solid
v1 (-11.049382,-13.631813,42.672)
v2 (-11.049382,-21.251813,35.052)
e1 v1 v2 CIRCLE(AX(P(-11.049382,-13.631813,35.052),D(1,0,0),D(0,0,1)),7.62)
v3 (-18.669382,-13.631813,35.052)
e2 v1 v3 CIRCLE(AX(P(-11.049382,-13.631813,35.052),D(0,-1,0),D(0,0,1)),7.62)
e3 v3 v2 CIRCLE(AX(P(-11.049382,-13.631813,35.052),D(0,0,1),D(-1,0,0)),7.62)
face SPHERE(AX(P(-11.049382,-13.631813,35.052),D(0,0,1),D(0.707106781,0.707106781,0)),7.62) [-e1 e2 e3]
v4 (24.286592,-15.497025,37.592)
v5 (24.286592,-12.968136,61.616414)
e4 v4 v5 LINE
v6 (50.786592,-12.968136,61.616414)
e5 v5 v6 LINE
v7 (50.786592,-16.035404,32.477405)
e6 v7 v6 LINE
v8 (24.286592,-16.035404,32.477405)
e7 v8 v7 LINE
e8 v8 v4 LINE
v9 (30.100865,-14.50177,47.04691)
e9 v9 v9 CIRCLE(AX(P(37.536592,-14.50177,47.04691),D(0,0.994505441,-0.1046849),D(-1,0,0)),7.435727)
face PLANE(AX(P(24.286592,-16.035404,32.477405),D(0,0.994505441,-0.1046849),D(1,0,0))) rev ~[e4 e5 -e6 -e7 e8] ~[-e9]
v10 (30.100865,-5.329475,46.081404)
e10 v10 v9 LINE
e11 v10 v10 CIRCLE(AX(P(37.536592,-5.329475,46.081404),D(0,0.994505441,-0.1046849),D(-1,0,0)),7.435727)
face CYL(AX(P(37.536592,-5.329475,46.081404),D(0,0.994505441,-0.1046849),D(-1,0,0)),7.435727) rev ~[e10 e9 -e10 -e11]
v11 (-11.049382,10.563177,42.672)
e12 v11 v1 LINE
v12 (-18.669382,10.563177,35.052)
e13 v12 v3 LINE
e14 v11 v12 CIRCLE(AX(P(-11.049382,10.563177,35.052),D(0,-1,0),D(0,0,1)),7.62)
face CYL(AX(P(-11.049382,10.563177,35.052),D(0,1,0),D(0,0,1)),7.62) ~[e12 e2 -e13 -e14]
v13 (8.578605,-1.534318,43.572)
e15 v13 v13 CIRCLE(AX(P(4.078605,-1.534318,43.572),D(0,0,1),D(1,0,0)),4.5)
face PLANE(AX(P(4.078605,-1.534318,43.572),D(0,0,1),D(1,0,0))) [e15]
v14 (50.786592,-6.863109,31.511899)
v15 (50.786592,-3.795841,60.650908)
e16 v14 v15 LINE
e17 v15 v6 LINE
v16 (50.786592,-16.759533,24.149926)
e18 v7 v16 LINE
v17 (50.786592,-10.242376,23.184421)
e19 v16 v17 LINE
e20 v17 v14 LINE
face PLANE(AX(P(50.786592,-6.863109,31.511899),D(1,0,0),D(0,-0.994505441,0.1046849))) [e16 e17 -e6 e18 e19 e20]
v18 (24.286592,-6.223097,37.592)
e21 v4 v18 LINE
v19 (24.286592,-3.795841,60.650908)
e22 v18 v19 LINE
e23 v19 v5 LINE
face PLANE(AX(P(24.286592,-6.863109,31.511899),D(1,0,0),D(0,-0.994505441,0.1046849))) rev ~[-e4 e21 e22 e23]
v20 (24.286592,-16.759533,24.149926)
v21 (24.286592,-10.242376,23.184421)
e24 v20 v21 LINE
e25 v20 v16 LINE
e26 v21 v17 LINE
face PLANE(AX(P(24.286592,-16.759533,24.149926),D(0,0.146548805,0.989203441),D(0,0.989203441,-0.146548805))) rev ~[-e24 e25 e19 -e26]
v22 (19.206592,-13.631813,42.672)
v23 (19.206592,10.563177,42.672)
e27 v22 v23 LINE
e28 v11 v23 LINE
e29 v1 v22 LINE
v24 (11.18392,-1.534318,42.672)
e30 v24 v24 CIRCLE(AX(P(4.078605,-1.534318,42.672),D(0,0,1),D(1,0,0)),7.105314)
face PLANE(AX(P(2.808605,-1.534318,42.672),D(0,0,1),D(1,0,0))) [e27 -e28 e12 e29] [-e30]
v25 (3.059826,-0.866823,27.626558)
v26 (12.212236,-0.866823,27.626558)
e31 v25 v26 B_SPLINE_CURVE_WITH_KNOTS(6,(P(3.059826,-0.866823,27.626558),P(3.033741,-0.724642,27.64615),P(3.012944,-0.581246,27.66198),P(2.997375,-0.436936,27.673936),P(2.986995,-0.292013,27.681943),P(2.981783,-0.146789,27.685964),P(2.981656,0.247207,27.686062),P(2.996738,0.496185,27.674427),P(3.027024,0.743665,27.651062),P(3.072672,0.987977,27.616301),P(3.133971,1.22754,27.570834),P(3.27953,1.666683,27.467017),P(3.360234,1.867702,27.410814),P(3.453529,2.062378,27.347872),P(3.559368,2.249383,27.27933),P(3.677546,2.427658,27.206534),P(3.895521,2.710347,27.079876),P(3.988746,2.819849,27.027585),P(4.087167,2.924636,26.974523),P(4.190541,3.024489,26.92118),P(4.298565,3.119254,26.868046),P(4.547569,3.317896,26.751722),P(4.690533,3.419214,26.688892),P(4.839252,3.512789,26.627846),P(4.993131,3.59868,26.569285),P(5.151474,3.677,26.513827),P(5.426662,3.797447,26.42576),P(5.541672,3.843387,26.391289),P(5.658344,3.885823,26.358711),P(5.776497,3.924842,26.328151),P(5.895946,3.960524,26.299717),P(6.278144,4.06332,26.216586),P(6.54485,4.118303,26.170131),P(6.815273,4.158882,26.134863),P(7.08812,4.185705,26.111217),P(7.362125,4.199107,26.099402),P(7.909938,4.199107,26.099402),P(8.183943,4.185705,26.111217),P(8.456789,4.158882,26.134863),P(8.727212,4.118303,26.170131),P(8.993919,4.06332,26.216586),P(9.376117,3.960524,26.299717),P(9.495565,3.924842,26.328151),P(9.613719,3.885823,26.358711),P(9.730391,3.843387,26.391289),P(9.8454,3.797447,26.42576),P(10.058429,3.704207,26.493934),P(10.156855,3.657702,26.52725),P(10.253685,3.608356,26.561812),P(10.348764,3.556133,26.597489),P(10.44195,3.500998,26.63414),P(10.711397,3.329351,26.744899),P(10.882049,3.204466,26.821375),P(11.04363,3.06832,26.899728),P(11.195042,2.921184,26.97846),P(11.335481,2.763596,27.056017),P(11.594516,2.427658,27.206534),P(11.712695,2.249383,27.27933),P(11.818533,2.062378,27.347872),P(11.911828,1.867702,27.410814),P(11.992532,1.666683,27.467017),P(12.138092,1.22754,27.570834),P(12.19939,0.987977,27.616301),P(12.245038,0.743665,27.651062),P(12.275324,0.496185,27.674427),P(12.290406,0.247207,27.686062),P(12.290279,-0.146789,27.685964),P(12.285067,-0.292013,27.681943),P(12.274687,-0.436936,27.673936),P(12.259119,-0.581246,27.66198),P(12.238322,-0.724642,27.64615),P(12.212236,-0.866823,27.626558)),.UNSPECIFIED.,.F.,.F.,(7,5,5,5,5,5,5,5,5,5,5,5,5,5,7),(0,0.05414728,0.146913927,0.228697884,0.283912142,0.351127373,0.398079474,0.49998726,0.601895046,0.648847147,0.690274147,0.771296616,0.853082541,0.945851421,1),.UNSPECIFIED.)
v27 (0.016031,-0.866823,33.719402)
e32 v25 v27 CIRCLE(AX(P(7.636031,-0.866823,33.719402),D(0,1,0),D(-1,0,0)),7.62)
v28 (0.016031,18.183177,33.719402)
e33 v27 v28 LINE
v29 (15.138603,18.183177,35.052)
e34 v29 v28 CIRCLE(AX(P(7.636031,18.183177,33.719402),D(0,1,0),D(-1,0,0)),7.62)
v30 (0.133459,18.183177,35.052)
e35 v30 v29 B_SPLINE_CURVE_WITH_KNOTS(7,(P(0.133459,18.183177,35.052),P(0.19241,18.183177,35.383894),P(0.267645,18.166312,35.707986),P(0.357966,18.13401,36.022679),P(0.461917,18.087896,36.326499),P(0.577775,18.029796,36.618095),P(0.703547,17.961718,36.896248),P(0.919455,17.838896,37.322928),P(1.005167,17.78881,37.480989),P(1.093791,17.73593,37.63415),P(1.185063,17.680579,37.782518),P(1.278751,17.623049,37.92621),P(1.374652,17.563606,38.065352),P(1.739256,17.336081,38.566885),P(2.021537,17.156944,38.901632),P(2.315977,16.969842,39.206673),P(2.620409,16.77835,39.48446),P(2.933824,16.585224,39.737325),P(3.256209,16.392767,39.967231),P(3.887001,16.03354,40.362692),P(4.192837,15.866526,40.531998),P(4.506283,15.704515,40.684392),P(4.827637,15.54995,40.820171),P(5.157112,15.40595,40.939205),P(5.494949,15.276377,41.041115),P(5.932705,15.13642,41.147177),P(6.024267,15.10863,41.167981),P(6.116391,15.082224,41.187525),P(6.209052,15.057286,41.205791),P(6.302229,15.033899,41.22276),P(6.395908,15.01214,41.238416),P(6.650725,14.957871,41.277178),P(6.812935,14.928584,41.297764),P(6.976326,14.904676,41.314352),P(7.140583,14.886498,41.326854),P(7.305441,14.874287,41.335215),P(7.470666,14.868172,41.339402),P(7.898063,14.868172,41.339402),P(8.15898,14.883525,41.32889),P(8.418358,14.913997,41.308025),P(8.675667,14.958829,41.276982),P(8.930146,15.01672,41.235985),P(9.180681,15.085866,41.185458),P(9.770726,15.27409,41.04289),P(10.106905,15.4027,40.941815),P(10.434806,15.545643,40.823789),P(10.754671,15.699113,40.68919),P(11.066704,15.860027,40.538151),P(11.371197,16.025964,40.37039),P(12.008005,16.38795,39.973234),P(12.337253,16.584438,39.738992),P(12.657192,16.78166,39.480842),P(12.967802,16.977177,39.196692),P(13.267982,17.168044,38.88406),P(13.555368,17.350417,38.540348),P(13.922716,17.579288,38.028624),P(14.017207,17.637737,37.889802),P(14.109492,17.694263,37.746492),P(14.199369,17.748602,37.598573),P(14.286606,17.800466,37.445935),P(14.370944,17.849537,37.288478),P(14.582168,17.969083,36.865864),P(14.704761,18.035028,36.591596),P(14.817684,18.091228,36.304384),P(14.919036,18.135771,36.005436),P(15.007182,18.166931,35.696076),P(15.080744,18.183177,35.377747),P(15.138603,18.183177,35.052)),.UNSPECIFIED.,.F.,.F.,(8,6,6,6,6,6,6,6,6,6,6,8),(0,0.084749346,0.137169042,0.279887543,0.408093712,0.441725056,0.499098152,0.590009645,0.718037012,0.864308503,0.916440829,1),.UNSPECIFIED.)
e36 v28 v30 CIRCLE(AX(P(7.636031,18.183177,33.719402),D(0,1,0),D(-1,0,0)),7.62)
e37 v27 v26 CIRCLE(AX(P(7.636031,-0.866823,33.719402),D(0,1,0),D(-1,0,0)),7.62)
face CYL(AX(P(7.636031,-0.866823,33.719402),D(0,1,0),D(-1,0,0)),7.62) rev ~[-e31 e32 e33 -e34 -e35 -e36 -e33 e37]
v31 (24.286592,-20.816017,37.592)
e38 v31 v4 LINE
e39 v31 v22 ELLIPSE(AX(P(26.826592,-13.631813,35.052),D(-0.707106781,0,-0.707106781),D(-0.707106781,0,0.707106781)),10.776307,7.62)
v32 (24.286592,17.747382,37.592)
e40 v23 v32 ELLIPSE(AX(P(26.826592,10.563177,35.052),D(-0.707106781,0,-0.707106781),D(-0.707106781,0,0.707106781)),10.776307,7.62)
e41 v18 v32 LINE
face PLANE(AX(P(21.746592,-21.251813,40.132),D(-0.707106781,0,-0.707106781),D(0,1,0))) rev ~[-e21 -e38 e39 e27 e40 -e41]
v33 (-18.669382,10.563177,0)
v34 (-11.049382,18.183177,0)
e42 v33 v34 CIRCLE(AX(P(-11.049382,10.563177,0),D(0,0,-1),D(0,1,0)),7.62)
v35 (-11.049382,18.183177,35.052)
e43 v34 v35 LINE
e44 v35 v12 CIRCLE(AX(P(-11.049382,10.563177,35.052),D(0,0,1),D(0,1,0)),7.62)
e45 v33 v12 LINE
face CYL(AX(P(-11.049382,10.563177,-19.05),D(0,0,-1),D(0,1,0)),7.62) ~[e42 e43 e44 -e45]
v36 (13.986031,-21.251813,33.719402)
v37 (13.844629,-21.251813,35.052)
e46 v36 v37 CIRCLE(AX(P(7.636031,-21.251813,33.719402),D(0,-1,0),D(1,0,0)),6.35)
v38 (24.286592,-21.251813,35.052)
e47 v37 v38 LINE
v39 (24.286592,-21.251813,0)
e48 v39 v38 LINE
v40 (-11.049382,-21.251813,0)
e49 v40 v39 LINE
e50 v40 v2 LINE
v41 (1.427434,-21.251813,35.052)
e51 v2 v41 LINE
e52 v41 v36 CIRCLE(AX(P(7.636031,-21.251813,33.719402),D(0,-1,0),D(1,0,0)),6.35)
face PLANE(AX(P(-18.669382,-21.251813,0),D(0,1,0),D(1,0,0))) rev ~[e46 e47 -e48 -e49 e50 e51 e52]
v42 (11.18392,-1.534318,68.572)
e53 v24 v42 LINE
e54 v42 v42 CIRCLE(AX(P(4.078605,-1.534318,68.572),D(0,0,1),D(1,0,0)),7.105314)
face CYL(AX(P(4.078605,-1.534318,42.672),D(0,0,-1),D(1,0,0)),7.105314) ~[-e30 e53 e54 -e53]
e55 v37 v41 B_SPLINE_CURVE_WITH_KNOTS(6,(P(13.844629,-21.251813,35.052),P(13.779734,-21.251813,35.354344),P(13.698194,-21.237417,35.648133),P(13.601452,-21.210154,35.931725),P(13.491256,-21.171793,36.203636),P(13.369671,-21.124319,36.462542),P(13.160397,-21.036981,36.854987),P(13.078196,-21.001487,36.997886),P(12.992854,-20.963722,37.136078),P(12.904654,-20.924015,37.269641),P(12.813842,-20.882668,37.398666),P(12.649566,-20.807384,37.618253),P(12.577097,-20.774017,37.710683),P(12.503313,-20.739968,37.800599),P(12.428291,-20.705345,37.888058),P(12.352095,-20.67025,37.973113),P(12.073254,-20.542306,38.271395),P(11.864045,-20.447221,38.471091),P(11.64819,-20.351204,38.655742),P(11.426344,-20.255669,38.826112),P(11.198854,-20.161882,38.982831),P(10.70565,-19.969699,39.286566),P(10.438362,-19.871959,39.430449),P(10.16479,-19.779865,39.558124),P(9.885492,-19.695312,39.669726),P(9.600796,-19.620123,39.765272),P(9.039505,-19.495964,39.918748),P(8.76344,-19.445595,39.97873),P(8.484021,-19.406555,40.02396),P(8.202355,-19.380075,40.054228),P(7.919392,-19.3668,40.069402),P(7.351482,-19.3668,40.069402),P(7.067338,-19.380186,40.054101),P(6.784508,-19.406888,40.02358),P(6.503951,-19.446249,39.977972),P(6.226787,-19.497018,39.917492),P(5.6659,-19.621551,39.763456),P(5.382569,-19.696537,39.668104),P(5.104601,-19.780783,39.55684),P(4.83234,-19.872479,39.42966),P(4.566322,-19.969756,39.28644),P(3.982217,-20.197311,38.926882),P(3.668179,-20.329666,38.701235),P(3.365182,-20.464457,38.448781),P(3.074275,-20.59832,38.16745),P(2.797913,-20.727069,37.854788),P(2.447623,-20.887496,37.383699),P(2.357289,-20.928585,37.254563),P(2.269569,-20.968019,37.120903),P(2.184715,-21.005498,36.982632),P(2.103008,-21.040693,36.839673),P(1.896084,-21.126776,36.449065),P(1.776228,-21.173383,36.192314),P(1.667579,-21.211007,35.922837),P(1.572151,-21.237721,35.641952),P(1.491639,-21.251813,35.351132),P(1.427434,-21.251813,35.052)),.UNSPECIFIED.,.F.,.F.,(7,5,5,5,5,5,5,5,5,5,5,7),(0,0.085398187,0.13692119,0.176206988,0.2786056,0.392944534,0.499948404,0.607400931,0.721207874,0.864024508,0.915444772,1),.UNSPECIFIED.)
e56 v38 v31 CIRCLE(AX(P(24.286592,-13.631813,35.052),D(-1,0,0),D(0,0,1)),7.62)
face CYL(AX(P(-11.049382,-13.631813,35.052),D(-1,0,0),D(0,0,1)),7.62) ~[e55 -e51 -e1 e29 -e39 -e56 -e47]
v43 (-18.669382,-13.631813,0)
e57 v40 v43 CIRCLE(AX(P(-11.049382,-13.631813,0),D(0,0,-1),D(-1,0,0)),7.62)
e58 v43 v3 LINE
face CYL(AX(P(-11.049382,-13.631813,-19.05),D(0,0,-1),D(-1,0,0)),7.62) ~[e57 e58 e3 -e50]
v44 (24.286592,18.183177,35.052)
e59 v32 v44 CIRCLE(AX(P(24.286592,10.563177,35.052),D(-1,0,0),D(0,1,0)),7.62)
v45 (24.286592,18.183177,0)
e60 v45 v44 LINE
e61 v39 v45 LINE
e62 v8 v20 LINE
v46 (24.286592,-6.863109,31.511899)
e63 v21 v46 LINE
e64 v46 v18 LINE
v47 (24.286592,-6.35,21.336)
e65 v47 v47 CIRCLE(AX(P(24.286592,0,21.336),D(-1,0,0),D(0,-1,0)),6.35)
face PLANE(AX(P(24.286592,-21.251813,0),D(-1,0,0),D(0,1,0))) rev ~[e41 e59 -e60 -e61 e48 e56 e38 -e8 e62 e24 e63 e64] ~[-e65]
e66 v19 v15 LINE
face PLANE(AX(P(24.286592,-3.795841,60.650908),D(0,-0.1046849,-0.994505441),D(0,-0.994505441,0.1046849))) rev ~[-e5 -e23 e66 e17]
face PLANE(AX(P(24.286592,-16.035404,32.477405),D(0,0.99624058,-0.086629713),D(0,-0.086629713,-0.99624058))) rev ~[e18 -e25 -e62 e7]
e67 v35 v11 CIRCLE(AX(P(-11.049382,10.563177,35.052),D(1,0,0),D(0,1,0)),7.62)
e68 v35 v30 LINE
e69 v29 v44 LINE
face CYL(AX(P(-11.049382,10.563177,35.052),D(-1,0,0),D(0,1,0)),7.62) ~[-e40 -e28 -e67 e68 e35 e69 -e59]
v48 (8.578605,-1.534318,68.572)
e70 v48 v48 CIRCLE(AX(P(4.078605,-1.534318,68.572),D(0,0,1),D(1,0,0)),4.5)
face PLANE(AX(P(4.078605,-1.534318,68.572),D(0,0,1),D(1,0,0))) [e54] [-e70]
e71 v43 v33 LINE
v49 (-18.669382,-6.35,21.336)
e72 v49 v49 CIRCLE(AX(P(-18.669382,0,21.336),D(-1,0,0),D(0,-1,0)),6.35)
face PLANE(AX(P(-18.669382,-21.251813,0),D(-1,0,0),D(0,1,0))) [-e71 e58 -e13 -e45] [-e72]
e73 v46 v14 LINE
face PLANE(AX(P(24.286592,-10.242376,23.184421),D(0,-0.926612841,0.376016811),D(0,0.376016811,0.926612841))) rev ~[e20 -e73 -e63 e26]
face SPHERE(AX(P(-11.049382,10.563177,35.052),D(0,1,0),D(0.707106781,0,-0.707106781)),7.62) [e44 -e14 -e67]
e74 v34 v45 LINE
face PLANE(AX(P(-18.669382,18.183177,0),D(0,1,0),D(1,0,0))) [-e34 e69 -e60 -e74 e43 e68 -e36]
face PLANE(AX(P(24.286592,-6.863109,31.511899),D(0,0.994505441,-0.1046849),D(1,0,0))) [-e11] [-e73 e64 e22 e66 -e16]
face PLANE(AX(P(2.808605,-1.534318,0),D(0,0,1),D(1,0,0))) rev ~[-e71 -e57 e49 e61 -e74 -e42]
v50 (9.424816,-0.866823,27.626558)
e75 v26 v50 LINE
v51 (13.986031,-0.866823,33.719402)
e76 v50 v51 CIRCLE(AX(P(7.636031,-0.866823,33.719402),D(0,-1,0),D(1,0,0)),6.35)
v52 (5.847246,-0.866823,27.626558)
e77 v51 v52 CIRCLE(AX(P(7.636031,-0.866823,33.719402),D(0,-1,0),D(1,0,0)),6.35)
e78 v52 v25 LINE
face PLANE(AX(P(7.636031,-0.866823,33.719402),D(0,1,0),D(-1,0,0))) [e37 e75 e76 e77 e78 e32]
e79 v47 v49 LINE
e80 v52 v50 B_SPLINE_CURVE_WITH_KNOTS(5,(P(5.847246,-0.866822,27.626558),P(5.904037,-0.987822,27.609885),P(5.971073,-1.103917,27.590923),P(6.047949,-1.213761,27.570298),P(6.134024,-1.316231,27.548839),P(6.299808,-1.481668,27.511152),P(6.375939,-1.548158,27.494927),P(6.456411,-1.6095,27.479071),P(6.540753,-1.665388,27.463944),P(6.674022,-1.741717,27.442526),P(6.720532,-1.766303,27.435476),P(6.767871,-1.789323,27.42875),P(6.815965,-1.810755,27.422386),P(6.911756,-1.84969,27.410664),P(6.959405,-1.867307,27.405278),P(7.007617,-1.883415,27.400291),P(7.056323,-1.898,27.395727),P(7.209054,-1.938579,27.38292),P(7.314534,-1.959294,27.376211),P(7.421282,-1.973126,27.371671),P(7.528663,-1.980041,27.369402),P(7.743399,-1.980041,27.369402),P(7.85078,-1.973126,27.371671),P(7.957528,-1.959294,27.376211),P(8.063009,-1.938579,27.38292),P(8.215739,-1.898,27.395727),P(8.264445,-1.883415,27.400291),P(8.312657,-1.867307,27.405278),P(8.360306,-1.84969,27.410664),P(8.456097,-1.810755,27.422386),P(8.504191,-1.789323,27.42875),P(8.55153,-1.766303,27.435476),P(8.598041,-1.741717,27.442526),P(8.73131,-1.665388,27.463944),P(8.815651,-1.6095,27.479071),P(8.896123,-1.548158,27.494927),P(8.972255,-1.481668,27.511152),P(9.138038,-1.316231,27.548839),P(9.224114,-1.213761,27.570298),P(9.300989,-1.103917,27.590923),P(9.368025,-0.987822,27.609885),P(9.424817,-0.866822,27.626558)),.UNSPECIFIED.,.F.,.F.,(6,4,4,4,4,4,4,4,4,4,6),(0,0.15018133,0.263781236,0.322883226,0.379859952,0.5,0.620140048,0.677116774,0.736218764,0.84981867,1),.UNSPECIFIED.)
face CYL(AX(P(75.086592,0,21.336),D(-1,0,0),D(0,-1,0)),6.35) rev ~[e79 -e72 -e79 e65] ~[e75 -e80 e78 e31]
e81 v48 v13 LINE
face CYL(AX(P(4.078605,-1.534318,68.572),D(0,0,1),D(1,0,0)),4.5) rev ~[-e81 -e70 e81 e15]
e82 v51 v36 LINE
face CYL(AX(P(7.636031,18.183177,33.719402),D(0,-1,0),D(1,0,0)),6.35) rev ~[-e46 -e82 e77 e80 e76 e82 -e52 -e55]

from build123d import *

# Parameters (mm, degrees)
F0_W           = 42.9559741169
F0_H           = 39.4349899143
F1_DEPTH       = 42.672
F3_D           = 12.7
F3_DEPTH       = 50.8
F3_TIP         = 3.8154649308
F5_D           = 12.7
F5_CBORE_D     = 15.24
F5_CBORE_DEPTH = 19.05
F6_SIZE        = 5.08
F7_T1_DEPTH    = 54.102
F7_T3_DEPTH    = 49.3059741169
F7_T5_DEPTH    = 24.1949899143
F7_S9_W        = 7.62
F7_S9_H        = 7.62
F7_T10_DEPTH   = 7.62
F7_S15_W       = 7.62
F7_S15_H       = 7.62
F7_T16_DEPTH   = 7.62
F11_R          = 7.1053142902
F12_DEPTH      = 25.9
F14_DEPTH      = 26.5
F15_DEPTH      = 29.3
F16_R          = 4.5
F17_DEPTH      = 25
F18_R          = 7.4357269109
F19_DEPTH      = 25


# Not quite as in the source:
# - a fillet or chamfer that OpenCascade refuses, or shapes differently, is made with other operations: its cross-section is extruded or revolved along the edge and cut away or added
# - the program builds the solid bodies; features that only make, move or delete a surface that nothing else refers to are left out


with BuildPart() as f1:
    # F0 (on Top) → F1 (new body)
    with BuildSketch(Plane.XY):
        with Locations((2.8086053208, -1.5343176201)):
            Rectangle(F0_W, F0_H)
    extrude(amount=F1_DEPTH)

    # F3
    with Locations(Plane.YZ.offset(24.2865923792)):
        with Locations((0, 21.336)):
            Hole(F3_D / 2, depth=F3_DEPTH)
            with Locations((0, 0, -(F3_DEPTH + F3_TIP / 2))):  # 118° drill point
                Cone(0, F3_D / 2, F3_TIP, mode=Mode.SUBTRACT)

    # F5 (through all)
    with Locations(Plane(origin=(0, 18.1831773371, 0), x_dir=(-1, 0, 0), z_dir=(0, 1, 0))):
        with Locations((-7.6360311359, 33.7194018066)):
            CounterBoreHole(F5_D / 2, F5_CBORE_D / 2, F5_CBORE_DEPTH)

    # F6
    f6_edges = [f1.edges().sort_by_distance(p)[0] for p in [
        (24.286592, -1.534318, 42.672),
    ]]
    chamfer(f6_edges, length=F6_SIZE)

    # F7: fillet of radius 7.62 on 5 edges, made by hand

    # F7_s2 → F7_t1 (cut)
    with BuildSketch(Plane.XY.offset(-19.05)):
        with BuildLine():
            ThreePointArc((-11.0493817377, 18.1831773371), (-16.4375354104, 15.9513310097), (-18.6693817377, 10.5631773371))
            Line((-18.6693817377, 10.5631773371), (-18.6693817377, 18.1831773371))
            Line((-18.6693817377, 18.1831773371), (-11.0493817377, 18.1831773371))
        make_face()
        with BuildLine():
            ThreePointArc((-18.6693817377, -13.6318125772), (-16.4375354104, -19.0199662499), (-11.0493817377, -21.2518125772))
            Line((-11.0493817377, -21.2518125772), (-18.6693817377, -21.2518125772))
            Line((-18.6693817377, -21.2518125772), (-18.6693817377, -13.6318125772))
        make_face()
    extrude(amount=F7_T1_DEPTH, mode=Mode.SUBTRACT)

    # F7_s4 → F7_t3 (cut)
    with BuildSketch(Plane.YZ.offset(-11.0493817377)):
        with BuildLine():
            ThreePointArc((18.1831773371, 35.052), (15.9513310097, 40.4401536726), (10.5631773371, 42.672))
            Line((10.5631773371, 42.672), (18.1831773371, 42.672))
            Line((18.1831773371, 42.672), (18.1831773371, 35.052))
        make_face()
        with BuildLine():
            ThreePointArc((-13.6318125772, 42.672), (-19.0199662499, 40.4401536726), (-21.2518125772, 35.052))
            Line((-21.2518125772, 35.052), (-21.2518125772, 42.672))
            Line((-21.2518125772, 42.672), (-13.6318125772, 42.672))
        make_face()
    extrude(amount=F7_T3_DEPTH, mode=Mode.SUBTRACT)

    # F7_s6 → F7_t5 (cut)
    with BuildSketch(Plane.XZ.offset(-10.5631773371)):
        with BuildLine():
            ThreePointArc((-11.0493817377, 42.672), (-16.4375354104, 40.4401536726), (-18.6693817377, 35.052))
            Line((-18.6693817377, 35.052), (-18.6693817377, 42.672))
            Line((-18.6693817377, 42.672), (-11.0493817377, 42.672))
        make_face()
    extrude(amount=F7_T5_DEPTH, mode=Mode.SUBTRACT)


with BuildPart() as f7_tool8:
    # F7_s9 → F7_t10 (new body)
    with BuildSketch(Plane.XZ.offset(-10.5631773371)):
        with Locations((-14.8593817377, 38.862)):
            Rectangle(F7_S9_W, F7_S9_H)
    extrude(amount=-F7_T10_DEPTH)

    # F7_s11 → F7_t12 (revolve, cut)
    with BuildSketch(Plane(origin=(-11.0493817377, 10.5631773371, 35.052), x_dir=(0.7071067812, 0, -0.7071067812), z_dir=(0.7071067812, 0, 0.7071067812))):
        with BuildLine():
            ThreePointArc((0, -7.62), (7.62, 0), (0, 7.62))
            Line((0, 7.62), (0, -7.62))
        make_face()
    revolve(axis=Axis((-11.0493817377, 10.5631773371, 35.052), (0, 1, 0)), mode=Mode.SUBTRACT)


with BuildPart() as f1_1:
    add(f1.part)

    # F7_t7: cut F7_tool8
    add(f7_tool8.part, mode=Mode.SUBTRACT)


with BuildPart() as f7_tool14:
    # F7_s15 → F7_t16 (new body)
    with BuildSketch(Plane.XY.offset(35.052)):
        with Locations((-14.8593817377, -17.4418125772)):
            Rectangle(F7_S15_W, F7_S15_H)
    extrude(amount=F7_T16_DEPTH)

    # F7_s17 → F7_t18 (revolve, cut)
    with BuildSketch(Plane(origin=(-11.0493817377, -13.6318125772, 35.052), x_dir=(0.7071067812, 0.7071067812, 0), z_dir=(0.7071067812, -0.7071067812, 0))):
        with BuildLine():
            ThreePointArc((0, -7.62), (7.62, 0), (0, 7.62))
            Line((0, 7.62), (0, -7.62))
        make_face()
    revolve(axis=Axis((-11.0493817377, -13.6318125772, 35.052), (0, 0, 1)), mode=Mode.SUBTRACT)


with BuildPart() as f1_2:
    add(f1_1.part)

    # F7_t13: cut F7_tool14
    add(f7_tool14.part, mode=Mode.SUBTRACT)

    # F11 (on face) → F12 (join)
    with BuildSketch(Plane.XY.offset(42.672)):
        with Locations((4.0786053208, -1.5343176201)):
            Circle(F11_R)
    extrude(amount=F12_DEPTH)

    # F13 (on face) → F14 (join)
    with BuildSketch(Plane.YZ.offset(24.2865923792)):
        Polygon((-6.8631088361, 31.5118990839), (-16.0354040563, 32.4774049222), (-16.7595334351, 24.1499263793), (-10.2423755452, 23.1844205409), align=None)
    extrude(amount=F14_DEPTH)

    # F15 (add): a face of the model
    f15_faces = [f1_2.faces().sort_by_distance(p)[0] for p in [
        (37.5365923792, -11.4492564462, 31.994652003),
    ]]
    extrude(f15_faces, amount=F15_DEPTH)

    # F16 (on face) → F17 (cut)
    with BuildSketch(Plane.XY.offset(68.572)):
        with Locations((4.0786053208, -1.5343176201)):
            Circle(F16_R)
    extrude(amount=-F17_DEPTH, mode=Mode.SUBTRACT)

    # F18 (on face) → F19 (cut)
    with BuildSketch(Plane(origin=(0, -10.0685909657, 1.0598528644), x_dir=(-1, 0, 0), z_dir=(0, 0.9945054407, -0.1046849002))):
        with Locations((-37.5365923792, 45.2702912239)):
            Circle(F18_R)
    extrude(amount=-F19_DEPTH, mode=Mode.SUBTRACT)


solid = f1_2.part
